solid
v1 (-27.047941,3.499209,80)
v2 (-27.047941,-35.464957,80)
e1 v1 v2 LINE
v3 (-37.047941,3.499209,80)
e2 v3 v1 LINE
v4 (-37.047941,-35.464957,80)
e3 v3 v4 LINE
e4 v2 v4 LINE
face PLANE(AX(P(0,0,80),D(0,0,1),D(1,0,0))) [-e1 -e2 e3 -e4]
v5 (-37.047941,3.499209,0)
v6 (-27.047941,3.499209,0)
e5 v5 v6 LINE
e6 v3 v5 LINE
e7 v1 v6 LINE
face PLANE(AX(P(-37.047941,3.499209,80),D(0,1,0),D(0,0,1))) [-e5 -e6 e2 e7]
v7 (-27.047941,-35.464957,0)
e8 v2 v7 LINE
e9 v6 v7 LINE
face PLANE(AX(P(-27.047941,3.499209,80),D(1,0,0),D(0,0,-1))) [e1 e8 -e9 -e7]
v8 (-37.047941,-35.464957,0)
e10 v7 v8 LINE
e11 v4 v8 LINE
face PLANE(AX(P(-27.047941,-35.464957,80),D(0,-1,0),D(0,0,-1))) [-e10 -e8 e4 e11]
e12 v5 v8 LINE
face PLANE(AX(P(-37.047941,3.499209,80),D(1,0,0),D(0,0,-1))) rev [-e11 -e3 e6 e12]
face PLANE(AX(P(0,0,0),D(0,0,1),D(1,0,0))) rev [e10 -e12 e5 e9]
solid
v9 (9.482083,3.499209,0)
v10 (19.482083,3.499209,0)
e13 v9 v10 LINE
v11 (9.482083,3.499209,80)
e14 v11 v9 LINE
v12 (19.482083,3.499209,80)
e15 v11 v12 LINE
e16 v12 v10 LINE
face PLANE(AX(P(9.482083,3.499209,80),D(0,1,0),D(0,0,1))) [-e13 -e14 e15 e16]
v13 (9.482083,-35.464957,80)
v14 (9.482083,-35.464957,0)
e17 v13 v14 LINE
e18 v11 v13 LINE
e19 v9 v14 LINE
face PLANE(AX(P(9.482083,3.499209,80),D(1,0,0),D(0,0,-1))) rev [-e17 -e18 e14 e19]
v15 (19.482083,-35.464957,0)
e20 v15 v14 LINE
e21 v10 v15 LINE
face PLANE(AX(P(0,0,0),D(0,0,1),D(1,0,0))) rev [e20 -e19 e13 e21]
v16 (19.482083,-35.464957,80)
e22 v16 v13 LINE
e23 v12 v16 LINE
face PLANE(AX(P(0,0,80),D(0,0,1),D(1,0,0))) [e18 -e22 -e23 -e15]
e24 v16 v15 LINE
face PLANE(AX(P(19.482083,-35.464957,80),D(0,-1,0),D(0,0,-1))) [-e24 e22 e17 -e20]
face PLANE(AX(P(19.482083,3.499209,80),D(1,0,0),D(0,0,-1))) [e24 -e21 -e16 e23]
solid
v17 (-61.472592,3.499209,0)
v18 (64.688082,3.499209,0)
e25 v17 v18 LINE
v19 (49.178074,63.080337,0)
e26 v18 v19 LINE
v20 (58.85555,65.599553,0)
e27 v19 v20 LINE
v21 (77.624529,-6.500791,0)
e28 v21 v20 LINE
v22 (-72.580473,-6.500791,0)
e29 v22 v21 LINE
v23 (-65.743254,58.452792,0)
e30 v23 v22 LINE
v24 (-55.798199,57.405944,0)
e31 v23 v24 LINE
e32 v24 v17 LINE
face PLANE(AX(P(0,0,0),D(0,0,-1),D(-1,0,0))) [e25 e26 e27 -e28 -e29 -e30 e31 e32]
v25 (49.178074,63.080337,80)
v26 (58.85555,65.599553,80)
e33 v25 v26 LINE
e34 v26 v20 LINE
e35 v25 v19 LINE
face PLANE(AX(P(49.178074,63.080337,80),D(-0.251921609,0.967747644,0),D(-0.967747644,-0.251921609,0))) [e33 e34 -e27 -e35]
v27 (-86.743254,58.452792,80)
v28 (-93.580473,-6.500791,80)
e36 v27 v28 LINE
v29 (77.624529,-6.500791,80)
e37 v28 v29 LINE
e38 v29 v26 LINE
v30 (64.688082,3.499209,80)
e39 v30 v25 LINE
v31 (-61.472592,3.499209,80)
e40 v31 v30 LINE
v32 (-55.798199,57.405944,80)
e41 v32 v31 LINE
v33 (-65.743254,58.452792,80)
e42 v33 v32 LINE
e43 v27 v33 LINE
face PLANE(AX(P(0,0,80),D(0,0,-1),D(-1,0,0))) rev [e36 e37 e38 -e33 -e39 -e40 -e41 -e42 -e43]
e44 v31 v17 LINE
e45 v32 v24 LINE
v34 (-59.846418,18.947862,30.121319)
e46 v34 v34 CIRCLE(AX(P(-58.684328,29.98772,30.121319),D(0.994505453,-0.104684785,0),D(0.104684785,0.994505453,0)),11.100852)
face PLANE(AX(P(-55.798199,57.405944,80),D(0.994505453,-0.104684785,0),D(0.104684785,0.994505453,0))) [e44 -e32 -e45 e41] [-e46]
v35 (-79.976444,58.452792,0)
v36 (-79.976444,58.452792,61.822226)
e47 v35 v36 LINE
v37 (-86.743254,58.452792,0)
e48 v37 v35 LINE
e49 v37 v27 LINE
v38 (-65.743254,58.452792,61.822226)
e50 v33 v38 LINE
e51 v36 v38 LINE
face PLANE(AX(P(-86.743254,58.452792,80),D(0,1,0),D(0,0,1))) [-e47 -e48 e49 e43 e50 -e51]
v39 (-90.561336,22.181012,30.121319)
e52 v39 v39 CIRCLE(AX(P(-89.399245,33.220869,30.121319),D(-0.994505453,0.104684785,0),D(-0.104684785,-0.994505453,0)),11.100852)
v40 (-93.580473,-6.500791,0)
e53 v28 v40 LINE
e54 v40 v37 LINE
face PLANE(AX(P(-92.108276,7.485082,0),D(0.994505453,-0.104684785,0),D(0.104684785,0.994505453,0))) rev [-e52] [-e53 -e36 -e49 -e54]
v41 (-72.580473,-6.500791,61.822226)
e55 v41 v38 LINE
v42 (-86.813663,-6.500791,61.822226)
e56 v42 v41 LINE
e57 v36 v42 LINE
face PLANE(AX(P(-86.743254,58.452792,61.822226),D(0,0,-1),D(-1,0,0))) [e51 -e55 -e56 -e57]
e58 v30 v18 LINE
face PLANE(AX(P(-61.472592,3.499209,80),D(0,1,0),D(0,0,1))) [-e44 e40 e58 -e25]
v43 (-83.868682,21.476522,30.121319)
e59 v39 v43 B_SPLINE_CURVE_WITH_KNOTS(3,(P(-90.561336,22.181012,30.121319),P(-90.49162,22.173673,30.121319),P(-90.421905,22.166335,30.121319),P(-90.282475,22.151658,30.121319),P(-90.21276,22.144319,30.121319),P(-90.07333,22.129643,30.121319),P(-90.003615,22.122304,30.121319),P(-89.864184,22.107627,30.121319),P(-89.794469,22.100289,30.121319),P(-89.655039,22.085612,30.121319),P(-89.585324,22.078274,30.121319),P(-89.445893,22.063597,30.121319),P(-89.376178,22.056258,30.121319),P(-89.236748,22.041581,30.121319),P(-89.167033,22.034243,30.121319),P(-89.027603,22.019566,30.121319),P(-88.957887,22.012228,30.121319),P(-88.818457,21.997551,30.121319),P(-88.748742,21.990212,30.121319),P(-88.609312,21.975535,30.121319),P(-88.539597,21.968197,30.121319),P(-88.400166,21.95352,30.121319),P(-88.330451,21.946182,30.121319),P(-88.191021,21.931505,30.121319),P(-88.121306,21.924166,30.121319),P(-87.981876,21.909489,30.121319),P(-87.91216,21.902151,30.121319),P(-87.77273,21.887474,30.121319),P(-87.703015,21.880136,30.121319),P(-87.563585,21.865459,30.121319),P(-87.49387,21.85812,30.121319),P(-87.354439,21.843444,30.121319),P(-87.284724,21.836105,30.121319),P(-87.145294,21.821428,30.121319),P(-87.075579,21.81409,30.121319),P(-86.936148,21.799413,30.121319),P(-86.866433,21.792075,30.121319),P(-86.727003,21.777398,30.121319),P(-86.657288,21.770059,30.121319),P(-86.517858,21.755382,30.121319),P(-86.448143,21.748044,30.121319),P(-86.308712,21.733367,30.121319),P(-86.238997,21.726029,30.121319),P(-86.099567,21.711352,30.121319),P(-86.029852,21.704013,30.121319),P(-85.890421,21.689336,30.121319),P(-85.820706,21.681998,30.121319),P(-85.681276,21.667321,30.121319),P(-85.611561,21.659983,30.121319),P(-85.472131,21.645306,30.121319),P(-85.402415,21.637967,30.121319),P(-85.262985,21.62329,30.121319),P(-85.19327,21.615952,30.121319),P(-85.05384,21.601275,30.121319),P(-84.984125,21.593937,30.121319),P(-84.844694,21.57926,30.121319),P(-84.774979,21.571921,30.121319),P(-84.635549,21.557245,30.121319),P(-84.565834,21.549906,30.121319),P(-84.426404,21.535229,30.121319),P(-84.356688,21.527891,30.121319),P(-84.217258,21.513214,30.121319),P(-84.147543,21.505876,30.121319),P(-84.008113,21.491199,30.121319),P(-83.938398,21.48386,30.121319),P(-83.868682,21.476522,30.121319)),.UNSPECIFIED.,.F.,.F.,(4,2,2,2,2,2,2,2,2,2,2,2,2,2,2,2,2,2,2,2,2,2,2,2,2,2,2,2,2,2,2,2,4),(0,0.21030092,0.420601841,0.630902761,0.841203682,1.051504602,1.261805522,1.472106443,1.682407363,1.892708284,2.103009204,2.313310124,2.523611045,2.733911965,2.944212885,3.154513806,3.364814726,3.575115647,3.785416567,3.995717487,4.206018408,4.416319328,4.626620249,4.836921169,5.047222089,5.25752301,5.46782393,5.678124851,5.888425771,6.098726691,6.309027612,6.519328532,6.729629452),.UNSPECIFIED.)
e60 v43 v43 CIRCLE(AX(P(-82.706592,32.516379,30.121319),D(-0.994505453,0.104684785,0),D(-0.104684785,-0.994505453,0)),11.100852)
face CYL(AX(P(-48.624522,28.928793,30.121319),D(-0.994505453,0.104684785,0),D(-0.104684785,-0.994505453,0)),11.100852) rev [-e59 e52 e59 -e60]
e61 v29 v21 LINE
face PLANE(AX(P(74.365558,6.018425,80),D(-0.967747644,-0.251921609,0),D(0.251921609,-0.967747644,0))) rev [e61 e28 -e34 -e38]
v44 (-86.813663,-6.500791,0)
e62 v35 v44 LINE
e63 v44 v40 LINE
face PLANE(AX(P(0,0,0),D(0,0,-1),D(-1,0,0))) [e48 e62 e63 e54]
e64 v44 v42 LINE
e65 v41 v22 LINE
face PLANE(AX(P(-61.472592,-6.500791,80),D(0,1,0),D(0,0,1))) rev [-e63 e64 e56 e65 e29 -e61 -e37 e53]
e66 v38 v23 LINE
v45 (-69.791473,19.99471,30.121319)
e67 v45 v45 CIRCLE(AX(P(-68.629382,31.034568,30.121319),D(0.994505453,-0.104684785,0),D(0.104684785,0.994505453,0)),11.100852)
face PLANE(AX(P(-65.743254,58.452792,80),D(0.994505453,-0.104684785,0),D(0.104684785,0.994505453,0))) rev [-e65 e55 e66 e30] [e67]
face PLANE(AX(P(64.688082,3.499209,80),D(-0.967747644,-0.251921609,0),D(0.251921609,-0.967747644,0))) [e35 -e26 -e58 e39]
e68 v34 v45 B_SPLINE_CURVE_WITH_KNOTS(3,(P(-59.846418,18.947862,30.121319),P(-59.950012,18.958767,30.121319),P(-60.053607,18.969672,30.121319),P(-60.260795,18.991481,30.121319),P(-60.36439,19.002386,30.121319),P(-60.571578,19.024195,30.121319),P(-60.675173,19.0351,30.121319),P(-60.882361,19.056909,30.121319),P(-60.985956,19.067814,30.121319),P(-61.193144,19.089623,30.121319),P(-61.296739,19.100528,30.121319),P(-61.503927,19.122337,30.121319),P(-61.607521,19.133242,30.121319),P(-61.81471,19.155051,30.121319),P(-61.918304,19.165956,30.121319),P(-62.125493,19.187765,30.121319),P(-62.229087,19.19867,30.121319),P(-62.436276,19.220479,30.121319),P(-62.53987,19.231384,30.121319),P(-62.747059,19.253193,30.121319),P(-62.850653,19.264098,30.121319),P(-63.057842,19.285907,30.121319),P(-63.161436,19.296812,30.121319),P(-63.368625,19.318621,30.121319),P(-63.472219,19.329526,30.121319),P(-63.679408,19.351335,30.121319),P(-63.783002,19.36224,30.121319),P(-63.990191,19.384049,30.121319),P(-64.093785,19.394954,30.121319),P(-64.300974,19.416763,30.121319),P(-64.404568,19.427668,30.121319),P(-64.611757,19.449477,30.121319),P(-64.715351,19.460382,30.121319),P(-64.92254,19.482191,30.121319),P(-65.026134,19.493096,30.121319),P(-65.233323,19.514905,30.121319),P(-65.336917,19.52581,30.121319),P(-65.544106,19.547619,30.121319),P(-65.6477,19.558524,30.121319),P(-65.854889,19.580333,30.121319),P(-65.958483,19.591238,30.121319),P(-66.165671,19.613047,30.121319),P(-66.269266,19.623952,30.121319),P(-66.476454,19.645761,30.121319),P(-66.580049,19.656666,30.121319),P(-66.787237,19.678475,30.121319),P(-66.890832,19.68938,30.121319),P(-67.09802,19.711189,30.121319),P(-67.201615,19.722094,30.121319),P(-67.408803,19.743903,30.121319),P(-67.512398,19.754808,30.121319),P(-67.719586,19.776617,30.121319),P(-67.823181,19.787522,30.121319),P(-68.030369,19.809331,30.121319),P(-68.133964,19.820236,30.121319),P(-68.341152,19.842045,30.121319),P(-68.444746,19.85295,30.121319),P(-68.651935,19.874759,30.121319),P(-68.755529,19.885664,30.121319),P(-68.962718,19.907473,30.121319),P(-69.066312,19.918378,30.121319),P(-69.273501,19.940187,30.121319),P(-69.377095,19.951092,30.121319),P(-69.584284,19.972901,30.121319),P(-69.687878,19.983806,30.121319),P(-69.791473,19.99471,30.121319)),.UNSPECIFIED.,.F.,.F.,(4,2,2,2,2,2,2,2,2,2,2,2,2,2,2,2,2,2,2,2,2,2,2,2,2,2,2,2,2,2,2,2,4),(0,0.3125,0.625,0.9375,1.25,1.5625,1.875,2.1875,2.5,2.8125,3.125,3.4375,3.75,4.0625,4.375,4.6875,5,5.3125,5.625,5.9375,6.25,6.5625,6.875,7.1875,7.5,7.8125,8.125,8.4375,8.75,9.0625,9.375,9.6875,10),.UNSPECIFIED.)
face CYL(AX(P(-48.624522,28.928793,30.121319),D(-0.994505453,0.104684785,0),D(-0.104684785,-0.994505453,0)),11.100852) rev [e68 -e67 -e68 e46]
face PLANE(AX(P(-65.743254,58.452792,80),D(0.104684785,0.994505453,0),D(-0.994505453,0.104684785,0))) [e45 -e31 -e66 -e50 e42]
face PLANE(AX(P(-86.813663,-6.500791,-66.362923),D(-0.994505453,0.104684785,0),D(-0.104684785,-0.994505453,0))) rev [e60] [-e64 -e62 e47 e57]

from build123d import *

# Parameters (mm, degrees)
EXTRUDE_THIN1_DEPTH   = 80
SKETCH1_W             = 10
SKETCH1_H             = 38.964166073
EXTRUDE_THIN1_2_DEPTH = 80
EXTRUDE_THIN1_3_DEPTH = 80
BOSS_EXTRUDE1_START   = 61.822225992
BOSS_EXTRUDE1_DEPTH   = 18.177774008
BOSS_EXTRUDE2_DEPTH   = 61.822225992
SKETCH4_R             = 11.100851837
CUT_EXTRUDE1_DEPTH    = 41


# Read off the part's stored shape, not the designer's step: Boss-Extrude1
with BuildPart() as part:
    # Sketch1 → Extrude-Thin1 (new body)
    with BuildSketch(Plane.XY):
        Polygon((-55.798198988, 57.405943705), (-61.472592106, 3.499209089), (64.688081539, 3.499209089), (49.178073684, 63.080336822), (58.855550127, 65.599552912), (77.624528519, -6.500790911), (-72.580472724, -6.500790911), (-65.743253517, 58.45279155), align=None)
    extrude(amount=EXTRUDE_THIN1_DEPTH)

    # Boss-Extrude1 outline → Boss-Extrude1 (add)
    with BuildSketch(Plane.XY.offset(BOSS_EXTRUDE1_START)):
        Polygon((-93.580472724, -6.500790911), (-72.580472724, -6.500790911), (-65.743253517, 58.45279155), (-86.743253517, 58.45279155), align=None)
    extrude(amount=BOSS_EXTRUDE1_DEPTH)

    # Sketch3 → Boss-Extrude2 (add)
    with BuildSketch(Plane(origin=(0, 0, 61.822225992), x_dir=(-1, 0, 0), z_dir=(0, 0, -1))):
        Polygon((93.580472724, -6.500790911), (86.813662715, -6.500790911), (79.976443509, 58.45279155), (86.743253517, 58.45279155), align=None)
    extrude(amount=BOSS_EXTRUDE2_DEPTH)

    # Sketch4 → Cut-Extrude1 (cut)
    with BuildSketch(Plane(origin=(-91.878138626, 9.671383013, 0), x_dir=(0, 0, 1), z_dir=(-0.994505452921406, 0.10468478451804275, 0))):
        with Locations(Location((30.121319387, 23.679594918, 0), (0, 0, 270))):
            Circle(SKETCH4_R)
    extrude(amount=-CUT_EXTRUDE1_DEPTH, mode=Mode.SUBTRACT)


with BuildPart() as body_2:
    # Sketch1 → Extrude-Thin1 2 (new body)
    with BuildSketch(Plane.XY):
        with Locations((-32.047940526, -15.982873948)):
            Rectangle(SKETCH1_W, SKETCH1_H)
    extrude(amount=EXTRUDE_THIN1_2_DEPTH)


with BuildPart() as body_3:
    # Sketch1 → Extrude-Thin1 3 (new body)
    with BuildSketch(Plane.XY):
        with Locations((14.482083037, -15.982873948)):
            Rectangle(SKETCH1_W, SKETCH1_H)
    extrude(amount=EXTRUDE_THIN1_3_DEPTH)


solid = Compound([part.part, body_2.part, body_3.part])
